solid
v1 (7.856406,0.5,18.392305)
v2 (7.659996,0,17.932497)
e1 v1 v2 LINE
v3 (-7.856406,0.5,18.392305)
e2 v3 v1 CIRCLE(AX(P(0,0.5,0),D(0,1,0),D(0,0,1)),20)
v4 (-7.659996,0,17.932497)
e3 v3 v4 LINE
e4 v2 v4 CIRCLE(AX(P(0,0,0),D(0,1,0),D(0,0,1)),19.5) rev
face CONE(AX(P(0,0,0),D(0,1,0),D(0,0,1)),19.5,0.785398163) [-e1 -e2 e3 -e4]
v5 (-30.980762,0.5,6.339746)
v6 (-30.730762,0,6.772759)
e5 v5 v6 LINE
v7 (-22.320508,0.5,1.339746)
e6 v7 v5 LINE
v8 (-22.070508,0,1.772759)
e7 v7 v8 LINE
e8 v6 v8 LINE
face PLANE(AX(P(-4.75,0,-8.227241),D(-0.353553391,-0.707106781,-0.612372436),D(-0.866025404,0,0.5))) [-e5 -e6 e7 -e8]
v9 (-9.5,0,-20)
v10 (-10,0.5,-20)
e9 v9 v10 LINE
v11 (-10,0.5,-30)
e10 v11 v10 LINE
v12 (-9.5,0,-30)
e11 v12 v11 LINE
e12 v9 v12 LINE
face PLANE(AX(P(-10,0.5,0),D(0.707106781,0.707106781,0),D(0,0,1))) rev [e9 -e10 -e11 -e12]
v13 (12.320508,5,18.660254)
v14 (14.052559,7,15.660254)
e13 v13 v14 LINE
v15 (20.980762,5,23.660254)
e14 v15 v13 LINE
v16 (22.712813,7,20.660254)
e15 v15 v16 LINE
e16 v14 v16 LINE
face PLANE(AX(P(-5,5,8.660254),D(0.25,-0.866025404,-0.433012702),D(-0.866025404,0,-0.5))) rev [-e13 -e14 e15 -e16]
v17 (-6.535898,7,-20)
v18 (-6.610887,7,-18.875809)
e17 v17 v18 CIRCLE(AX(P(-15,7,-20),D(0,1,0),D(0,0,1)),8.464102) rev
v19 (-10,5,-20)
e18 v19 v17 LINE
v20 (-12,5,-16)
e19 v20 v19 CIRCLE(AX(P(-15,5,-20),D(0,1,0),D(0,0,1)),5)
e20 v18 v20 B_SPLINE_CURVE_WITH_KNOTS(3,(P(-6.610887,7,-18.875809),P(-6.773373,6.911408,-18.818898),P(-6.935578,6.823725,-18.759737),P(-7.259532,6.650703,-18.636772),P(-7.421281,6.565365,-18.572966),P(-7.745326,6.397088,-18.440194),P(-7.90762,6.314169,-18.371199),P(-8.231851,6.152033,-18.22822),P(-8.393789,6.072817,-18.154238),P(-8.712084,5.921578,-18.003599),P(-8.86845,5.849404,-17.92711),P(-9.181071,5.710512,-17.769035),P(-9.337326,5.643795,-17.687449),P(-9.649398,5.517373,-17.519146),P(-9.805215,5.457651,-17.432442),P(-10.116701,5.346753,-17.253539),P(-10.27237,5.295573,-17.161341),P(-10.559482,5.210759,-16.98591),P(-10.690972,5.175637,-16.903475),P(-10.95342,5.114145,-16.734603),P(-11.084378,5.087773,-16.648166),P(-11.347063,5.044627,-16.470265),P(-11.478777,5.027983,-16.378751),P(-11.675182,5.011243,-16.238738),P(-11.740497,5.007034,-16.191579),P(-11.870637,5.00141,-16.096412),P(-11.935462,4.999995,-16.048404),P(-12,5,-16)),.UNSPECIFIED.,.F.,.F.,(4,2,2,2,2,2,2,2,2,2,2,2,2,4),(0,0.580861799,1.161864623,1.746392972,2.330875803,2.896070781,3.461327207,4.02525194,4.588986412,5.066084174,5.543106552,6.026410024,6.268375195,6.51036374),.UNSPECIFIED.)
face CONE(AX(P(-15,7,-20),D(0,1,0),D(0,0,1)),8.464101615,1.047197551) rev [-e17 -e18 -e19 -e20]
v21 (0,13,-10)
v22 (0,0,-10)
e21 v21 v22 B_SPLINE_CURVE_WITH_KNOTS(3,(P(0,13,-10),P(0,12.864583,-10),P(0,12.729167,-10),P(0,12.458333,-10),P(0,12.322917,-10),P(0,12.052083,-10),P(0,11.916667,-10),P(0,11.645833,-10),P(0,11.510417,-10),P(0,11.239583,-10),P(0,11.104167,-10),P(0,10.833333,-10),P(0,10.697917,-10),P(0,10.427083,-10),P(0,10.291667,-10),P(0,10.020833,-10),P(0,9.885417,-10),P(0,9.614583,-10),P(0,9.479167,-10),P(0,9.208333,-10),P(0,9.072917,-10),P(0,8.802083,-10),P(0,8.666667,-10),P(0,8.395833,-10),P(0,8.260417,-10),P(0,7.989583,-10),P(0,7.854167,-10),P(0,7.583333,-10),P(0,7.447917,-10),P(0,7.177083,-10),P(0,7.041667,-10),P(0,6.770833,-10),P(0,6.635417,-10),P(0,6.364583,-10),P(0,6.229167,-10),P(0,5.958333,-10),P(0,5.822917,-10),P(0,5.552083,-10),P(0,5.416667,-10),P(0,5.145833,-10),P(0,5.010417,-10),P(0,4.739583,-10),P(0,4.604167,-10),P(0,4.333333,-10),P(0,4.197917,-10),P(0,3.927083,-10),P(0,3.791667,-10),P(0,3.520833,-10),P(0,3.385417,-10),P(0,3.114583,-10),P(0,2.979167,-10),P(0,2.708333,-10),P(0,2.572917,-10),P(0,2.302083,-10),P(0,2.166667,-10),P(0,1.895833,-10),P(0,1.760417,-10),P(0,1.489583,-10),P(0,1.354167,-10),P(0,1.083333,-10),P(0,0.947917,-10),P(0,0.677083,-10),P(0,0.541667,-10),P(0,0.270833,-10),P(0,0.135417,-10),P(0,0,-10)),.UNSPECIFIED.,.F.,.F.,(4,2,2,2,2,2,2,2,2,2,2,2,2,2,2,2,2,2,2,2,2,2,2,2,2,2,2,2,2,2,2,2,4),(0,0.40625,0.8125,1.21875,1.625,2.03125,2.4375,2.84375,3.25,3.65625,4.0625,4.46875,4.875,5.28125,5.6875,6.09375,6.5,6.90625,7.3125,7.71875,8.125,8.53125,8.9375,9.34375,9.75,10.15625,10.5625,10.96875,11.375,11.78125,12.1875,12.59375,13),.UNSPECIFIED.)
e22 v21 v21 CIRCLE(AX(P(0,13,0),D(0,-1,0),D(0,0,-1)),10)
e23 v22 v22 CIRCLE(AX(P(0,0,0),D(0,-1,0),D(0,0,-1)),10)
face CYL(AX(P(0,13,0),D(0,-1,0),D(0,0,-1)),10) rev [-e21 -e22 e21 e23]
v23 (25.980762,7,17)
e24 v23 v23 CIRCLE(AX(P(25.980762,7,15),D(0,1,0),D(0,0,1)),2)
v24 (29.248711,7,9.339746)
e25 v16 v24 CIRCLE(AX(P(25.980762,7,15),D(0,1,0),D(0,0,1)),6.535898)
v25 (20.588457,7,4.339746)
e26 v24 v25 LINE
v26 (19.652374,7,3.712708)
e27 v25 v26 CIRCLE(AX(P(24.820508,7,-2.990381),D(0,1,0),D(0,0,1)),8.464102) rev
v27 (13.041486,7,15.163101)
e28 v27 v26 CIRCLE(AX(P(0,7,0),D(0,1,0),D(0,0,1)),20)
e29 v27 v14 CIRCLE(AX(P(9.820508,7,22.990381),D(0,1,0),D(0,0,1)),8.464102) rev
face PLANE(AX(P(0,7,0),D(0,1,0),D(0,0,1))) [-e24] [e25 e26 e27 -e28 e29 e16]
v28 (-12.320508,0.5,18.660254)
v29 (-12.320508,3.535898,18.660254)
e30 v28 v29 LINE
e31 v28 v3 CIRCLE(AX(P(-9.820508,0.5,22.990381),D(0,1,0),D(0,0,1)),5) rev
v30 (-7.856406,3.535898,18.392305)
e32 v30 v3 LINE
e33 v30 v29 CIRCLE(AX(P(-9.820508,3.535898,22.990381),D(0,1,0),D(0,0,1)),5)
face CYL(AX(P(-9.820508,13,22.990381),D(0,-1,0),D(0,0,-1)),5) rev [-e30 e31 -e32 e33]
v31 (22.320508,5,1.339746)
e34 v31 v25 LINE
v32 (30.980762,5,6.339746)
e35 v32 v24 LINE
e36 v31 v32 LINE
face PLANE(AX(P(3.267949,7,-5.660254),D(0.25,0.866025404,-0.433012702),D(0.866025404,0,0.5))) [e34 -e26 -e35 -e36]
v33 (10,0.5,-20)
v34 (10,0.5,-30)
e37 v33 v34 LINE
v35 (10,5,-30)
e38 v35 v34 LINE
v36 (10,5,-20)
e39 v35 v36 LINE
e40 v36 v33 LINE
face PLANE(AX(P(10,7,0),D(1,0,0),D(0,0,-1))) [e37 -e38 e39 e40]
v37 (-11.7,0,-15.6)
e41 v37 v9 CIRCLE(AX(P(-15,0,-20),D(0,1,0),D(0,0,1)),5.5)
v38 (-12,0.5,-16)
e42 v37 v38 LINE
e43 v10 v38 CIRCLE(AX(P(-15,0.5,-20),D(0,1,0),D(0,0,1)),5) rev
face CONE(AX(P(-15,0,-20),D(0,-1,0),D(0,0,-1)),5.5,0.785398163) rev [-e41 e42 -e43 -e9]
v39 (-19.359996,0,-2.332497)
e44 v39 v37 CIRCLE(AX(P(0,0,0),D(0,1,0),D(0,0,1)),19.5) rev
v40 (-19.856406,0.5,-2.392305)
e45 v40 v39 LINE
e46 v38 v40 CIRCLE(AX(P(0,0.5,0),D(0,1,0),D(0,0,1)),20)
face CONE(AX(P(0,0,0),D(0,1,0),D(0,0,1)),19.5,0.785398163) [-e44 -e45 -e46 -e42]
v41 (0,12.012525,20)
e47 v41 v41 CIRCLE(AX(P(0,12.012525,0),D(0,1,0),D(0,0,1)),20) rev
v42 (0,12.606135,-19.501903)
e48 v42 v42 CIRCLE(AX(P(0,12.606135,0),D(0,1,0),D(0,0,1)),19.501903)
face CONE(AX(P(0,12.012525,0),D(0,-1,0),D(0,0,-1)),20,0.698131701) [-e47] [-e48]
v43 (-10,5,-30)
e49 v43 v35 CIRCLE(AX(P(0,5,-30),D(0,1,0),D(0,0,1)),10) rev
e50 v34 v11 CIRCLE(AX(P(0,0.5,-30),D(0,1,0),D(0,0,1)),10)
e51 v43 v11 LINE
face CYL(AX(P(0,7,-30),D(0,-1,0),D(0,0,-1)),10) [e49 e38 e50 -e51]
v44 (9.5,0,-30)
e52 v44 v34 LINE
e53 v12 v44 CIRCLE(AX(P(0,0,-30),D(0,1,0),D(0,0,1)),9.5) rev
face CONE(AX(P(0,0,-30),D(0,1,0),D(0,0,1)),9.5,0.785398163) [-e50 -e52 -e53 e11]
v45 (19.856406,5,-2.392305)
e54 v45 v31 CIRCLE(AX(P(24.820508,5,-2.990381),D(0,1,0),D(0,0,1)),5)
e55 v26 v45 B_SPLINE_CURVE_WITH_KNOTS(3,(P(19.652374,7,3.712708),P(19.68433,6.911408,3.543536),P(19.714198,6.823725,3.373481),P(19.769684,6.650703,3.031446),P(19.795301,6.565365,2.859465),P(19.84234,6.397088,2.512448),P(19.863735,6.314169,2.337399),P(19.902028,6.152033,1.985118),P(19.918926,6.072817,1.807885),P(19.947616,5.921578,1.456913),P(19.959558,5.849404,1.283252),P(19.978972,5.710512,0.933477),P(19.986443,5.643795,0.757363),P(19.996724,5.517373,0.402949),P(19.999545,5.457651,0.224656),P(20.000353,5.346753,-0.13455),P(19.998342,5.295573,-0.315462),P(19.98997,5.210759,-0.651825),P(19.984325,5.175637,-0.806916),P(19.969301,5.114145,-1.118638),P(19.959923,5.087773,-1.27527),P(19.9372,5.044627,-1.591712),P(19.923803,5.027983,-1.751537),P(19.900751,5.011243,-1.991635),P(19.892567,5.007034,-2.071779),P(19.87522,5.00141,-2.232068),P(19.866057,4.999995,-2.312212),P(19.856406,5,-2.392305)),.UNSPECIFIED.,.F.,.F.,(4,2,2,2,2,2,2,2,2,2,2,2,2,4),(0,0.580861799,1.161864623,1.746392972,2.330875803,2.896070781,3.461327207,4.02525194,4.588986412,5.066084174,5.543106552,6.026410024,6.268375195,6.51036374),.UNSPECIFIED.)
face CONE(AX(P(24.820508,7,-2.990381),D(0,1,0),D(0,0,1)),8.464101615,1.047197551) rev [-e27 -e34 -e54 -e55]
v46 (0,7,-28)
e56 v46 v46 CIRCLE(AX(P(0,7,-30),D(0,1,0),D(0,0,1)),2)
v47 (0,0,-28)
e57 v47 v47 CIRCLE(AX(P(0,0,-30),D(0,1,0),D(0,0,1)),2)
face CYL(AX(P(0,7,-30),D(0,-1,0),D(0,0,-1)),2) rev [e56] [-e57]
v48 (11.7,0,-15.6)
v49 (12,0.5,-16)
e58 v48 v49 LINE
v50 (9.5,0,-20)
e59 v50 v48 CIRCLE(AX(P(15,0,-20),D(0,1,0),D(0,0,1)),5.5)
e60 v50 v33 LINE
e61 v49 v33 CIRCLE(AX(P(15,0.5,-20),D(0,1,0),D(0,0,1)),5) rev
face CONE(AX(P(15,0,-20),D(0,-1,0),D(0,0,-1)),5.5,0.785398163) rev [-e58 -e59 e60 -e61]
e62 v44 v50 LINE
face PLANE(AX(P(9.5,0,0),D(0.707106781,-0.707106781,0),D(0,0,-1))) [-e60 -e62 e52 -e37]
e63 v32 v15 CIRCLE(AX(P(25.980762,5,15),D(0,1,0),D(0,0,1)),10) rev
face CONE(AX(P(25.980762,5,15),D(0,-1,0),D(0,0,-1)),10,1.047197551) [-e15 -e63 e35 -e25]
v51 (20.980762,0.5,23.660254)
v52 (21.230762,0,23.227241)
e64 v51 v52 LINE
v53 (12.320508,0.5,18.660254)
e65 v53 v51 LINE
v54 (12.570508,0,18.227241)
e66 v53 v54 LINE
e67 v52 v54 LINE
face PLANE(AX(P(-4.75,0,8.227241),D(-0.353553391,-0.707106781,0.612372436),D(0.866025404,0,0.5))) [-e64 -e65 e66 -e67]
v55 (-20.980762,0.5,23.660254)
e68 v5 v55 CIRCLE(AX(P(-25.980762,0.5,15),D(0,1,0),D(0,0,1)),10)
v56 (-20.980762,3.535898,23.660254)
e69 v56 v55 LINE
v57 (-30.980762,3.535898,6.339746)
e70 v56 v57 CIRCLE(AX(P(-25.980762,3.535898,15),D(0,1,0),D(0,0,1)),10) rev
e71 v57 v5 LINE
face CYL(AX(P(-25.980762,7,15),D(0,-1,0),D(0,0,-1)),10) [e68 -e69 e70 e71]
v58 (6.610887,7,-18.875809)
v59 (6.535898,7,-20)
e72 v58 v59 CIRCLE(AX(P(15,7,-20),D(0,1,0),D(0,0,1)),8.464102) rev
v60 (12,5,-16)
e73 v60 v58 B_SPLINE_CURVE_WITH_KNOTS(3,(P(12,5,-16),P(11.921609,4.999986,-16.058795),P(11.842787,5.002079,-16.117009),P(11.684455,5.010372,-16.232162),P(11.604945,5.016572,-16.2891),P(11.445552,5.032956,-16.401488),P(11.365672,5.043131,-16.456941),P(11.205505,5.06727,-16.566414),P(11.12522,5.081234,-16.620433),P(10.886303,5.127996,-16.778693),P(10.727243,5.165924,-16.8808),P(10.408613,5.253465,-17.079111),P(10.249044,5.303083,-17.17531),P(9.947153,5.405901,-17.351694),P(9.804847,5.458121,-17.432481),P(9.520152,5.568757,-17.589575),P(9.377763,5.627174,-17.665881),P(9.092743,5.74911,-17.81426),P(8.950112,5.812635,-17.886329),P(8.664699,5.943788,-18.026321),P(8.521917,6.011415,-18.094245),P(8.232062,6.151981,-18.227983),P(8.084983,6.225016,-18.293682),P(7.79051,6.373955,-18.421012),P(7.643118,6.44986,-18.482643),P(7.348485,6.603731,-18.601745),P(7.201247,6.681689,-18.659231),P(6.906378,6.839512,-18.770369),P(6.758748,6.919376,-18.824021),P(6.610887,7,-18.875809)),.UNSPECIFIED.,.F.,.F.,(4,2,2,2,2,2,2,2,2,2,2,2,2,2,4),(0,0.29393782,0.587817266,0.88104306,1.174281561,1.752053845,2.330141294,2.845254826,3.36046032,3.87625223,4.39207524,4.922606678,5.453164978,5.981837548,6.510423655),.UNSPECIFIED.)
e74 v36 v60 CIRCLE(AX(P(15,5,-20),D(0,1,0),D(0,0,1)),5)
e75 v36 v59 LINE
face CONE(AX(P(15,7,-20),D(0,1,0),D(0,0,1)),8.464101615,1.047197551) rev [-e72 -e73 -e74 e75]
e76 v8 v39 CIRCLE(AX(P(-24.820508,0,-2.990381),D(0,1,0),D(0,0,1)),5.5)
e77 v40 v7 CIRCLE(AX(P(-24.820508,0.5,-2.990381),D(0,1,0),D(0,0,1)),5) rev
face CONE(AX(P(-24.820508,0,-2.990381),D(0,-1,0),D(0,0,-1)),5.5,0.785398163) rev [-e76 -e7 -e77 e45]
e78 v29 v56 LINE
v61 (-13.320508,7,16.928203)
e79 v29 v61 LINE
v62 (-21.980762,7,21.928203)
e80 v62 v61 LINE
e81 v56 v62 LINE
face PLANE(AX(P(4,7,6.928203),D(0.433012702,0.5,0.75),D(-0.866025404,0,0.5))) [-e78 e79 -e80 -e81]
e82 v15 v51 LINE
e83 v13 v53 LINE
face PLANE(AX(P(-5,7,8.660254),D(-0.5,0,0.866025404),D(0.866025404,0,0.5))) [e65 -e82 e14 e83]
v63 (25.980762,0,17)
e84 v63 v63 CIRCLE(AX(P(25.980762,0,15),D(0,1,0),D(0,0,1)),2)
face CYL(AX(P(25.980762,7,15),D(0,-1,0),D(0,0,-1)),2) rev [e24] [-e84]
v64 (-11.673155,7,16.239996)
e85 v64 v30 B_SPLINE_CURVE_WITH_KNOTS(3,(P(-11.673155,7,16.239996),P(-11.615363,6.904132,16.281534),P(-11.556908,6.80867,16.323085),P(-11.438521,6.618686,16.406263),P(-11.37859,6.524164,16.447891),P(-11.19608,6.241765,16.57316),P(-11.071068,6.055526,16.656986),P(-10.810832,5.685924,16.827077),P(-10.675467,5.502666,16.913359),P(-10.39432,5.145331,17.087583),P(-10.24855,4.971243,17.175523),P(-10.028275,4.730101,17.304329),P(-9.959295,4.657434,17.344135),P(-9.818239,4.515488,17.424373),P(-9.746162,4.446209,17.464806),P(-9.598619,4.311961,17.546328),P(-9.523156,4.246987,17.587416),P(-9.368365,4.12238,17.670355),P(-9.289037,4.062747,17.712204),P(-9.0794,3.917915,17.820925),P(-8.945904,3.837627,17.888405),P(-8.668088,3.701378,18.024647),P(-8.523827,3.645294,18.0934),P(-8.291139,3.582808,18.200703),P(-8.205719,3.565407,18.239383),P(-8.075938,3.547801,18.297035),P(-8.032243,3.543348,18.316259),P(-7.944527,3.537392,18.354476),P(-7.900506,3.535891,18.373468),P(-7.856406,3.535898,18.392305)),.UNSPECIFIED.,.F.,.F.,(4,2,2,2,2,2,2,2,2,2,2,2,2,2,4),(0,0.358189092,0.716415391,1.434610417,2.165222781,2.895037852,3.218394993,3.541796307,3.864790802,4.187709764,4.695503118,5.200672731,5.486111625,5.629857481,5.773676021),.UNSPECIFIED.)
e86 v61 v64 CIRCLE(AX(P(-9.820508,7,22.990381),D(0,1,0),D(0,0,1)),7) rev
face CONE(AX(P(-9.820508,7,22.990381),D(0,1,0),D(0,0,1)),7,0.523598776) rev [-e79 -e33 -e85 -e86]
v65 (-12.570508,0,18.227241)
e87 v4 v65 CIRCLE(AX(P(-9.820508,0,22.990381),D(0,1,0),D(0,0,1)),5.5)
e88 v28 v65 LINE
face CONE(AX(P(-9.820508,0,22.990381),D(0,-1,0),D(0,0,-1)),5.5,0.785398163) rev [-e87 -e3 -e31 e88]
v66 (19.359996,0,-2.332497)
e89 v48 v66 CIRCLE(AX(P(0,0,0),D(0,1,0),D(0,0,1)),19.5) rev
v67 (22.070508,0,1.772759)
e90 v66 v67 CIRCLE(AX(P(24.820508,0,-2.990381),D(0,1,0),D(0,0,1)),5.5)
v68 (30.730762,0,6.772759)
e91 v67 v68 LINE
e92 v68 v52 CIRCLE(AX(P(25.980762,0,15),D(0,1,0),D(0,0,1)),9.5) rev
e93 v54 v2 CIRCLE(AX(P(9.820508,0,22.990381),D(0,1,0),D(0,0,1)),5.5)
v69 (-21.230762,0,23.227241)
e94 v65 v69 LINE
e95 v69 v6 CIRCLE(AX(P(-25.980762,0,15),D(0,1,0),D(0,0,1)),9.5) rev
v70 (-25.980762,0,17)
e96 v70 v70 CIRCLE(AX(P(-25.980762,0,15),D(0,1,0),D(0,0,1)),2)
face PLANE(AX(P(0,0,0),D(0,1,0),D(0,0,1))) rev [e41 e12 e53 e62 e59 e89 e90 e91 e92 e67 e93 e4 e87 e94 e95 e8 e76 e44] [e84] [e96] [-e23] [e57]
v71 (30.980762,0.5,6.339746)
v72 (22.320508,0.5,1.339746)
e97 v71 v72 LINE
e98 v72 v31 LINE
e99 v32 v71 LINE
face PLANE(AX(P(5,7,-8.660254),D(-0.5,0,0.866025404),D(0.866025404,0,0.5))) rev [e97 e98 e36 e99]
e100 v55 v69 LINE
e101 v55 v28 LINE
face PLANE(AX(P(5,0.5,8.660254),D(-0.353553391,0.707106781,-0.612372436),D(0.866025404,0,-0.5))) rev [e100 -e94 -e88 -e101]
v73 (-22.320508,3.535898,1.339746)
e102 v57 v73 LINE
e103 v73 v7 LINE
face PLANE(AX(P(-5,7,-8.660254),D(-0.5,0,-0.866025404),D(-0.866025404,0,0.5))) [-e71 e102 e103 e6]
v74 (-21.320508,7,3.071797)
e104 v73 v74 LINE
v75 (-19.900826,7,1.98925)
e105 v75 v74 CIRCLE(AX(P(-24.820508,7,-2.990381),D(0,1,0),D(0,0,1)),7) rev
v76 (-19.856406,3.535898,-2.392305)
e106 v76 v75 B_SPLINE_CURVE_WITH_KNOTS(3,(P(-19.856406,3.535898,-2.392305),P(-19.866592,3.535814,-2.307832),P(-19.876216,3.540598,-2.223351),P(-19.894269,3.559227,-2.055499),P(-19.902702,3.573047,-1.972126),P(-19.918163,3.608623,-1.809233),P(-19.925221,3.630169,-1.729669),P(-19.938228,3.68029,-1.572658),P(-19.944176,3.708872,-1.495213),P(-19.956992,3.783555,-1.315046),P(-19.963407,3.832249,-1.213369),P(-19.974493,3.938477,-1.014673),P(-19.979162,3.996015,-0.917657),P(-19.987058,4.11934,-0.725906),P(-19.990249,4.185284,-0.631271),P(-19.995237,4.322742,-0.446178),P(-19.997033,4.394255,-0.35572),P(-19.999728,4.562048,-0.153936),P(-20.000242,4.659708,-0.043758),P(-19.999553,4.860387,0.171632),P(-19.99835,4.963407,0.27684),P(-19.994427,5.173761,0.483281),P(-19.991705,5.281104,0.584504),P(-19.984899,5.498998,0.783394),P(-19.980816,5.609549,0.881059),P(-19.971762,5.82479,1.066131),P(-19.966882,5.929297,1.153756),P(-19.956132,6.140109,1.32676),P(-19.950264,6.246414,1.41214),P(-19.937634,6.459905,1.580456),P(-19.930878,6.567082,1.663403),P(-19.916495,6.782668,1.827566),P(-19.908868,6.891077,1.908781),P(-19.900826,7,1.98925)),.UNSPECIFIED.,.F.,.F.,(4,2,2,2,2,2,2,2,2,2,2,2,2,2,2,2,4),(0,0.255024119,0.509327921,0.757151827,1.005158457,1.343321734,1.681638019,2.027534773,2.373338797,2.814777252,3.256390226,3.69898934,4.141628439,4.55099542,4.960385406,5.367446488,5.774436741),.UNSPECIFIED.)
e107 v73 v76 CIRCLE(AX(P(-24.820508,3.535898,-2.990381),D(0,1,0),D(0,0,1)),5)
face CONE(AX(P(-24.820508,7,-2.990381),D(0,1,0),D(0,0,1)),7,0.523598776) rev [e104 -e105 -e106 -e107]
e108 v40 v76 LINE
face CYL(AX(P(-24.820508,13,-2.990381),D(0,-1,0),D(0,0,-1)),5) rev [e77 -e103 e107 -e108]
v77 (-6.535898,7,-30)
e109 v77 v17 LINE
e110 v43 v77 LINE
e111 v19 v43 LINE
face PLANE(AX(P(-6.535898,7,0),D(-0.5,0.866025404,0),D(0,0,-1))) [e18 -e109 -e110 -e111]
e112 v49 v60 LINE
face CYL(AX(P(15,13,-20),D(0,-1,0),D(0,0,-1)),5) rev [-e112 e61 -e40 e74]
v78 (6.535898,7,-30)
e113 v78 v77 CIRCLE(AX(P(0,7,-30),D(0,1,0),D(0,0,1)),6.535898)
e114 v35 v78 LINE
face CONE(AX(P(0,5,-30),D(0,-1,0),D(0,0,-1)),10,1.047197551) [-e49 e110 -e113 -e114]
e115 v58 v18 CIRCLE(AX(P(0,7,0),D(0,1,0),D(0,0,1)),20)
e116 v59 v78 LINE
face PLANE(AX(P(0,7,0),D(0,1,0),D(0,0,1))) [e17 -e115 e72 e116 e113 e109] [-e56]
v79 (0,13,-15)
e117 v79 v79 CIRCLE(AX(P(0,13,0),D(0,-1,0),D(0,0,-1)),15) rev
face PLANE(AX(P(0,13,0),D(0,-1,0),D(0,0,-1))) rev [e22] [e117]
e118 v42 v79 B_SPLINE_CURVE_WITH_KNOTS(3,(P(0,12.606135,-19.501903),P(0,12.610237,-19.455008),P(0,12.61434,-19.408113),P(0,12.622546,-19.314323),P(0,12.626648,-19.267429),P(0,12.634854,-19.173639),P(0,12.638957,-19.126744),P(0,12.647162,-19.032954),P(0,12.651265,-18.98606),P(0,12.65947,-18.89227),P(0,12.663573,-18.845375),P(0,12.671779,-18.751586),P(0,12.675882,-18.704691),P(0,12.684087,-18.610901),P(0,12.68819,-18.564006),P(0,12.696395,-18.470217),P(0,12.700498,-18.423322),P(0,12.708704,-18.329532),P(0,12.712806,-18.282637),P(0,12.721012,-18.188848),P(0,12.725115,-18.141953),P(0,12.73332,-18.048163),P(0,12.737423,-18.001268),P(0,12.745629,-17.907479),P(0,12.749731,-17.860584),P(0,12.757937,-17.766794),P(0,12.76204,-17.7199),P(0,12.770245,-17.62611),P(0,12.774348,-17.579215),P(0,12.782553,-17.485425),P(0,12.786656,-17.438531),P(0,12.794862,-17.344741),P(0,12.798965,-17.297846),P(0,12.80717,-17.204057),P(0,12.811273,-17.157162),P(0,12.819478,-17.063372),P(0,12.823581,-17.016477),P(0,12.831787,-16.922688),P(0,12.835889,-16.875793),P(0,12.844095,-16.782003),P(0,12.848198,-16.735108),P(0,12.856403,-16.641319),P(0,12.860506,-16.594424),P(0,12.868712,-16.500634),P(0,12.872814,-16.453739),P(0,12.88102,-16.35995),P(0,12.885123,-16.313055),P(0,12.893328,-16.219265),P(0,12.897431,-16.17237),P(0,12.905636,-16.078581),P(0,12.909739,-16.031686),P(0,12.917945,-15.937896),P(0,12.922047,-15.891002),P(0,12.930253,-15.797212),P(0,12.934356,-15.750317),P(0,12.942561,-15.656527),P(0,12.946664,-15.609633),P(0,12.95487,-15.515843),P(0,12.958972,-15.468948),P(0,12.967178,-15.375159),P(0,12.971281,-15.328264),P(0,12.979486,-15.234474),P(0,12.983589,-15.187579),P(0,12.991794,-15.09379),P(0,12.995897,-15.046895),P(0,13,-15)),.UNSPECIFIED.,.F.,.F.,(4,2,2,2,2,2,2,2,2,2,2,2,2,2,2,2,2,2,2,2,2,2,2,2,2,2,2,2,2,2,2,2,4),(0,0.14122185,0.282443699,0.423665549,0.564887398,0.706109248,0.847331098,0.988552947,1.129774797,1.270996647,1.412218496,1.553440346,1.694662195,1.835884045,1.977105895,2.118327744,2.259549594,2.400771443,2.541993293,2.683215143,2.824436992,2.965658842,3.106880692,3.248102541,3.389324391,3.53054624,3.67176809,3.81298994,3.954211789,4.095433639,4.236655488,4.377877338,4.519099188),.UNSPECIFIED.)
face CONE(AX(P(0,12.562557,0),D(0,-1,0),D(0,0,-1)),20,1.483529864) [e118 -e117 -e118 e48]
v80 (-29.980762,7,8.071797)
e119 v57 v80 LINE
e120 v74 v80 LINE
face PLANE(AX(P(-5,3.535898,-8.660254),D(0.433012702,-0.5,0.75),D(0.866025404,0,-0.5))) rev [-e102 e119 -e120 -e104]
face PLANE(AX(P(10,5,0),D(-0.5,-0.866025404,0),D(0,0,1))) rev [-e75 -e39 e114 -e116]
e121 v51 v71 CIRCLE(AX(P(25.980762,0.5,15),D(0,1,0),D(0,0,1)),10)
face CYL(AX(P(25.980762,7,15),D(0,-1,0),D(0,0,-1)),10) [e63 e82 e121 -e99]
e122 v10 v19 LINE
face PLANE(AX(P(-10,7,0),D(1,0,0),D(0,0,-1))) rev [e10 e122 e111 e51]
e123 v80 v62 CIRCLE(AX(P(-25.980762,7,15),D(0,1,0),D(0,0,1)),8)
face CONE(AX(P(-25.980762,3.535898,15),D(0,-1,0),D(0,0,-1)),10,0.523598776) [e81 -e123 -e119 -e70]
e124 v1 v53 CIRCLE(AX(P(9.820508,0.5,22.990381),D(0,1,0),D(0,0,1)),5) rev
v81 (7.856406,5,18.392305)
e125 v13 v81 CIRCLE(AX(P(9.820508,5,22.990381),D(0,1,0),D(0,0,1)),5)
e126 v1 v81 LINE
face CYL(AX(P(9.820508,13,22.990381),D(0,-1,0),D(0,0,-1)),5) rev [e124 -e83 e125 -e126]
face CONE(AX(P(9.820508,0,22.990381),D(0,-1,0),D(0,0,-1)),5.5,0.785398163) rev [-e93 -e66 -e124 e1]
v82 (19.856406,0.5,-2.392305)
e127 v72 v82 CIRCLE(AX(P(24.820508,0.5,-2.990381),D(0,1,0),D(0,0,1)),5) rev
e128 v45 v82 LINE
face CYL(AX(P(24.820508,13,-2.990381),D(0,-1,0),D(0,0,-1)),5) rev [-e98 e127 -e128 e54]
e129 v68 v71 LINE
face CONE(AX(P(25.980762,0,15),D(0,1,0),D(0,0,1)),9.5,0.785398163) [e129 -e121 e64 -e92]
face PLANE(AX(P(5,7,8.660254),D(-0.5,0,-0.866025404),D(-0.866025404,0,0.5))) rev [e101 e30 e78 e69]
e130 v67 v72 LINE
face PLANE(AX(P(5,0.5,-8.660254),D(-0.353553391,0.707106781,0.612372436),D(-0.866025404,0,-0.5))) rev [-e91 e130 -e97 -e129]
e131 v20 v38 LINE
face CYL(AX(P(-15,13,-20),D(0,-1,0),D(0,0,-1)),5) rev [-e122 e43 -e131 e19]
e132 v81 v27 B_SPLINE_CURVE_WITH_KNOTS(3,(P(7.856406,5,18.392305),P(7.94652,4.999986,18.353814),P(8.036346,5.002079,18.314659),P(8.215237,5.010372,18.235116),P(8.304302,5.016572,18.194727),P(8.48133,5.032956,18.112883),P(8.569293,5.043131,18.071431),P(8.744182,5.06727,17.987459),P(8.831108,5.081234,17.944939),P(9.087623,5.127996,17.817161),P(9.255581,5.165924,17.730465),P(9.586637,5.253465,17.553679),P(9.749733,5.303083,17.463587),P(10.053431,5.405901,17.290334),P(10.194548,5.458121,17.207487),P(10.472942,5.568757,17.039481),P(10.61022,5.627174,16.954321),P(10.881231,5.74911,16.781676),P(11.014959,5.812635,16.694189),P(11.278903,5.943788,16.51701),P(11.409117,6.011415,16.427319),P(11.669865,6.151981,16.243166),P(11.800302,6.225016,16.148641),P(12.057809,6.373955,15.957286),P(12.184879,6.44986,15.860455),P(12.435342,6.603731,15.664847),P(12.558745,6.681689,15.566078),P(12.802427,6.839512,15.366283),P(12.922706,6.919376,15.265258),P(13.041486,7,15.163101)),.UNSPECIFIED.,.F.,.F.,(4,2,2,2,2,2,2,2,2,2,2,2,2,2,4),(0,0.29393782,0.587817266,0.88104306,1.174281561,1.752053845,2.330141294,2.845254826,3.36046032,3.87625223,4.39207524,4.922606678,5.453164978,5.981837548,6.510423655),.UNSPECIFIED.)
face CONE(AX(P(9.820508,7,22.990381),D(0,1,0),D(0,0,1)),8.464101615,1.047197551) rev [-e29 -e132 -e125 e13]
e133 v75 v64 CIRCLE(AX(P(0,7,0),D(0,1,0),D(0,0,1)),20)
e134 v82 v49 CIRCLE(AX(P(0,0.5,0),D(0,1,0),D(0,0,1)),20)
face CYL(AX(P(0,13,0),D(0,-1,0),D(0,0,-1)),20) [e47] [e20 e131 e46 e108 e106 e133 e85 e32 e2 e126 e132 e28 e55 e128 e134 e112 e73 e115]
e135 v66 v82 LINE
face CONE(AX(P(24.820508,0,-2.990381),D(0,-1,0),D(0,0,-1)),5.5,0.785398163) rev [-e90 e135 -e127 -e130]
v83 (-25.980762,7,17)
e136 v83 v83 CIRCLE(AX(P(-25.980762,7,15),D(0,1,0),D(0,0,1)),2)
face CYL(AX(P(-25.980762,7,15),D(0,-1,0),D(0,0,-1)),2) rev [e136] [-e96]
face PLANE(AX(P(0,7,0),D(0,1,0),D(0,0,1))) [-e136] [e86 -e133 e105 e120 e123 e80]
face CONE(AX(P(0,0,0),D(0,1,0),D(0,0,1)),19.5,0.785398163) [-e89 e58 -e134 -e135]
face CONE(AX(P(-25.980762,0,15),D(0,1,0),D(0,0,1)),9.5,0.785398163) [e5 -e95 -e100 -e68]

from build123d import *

# Parameters (mm, degrees)
SKETCH_2_R        = 2
EXTRUDE_1_DEPTH   = 7
EXTRUDE_1_2_DEPTH = 7
EXTRUDE_1_3_DEPTH = 7
SKETCH_3_R        = 20
SKETCH_3_R_2      = 10
EXTRUDE_2_DEPTH   = 13
FILLET_1_R        = 5
CHAMFER_1_SIZE    = 5
CHAMFER_1_SIZE2   = 0.437443318
CHAMFER_2_SIZE    = 3.464101615
CHAMFER_2_SIZE_2  = 2
CHAMFER_3_SIZE    = 0.5
CHAMFER_4_SIZE    = 0.5
CHAMFER_4_SIZE2   = 0.550031434


with BuildPart() as part:
    # ｽｹｯﾁ2 → ﾎﾞｽ - 押し出し1 (new body)
    with BuildSketch(Plane(origin=(0, 0, 0), x_dir=(1, 0, 0), z_dir=(0, 1, 0))):
        with BuildLine():
            Line((10, -17.320508076), (20.980762114, -23.660254038))
            ThreePointArc((20.980762114, -23.660254038), (34.641016151, -20), (30.980762114, -6.339745962))
            Line((30.980762114, -6.339745962), (20, 0))
            ThreePointArc((20, 0), (17.320508076, -10), (10, -17.320508076))
        make_face()
        with Locations(Location((25.980762114, -15, 0), (0, 0, 270))):
            Circle(SKETCH_2_R, mode=Mode.SUBTRACT)
    extrude(amount=EXTRUDE_1_DEPTH)



with BuildPart() as body_2:
    # ｽｹｯﾁ2 → Extrude 1 2 (new body)
    with BuildSketch(Plane(origin=(0, 0, 0), x_dir=(1, 0, 0), z_dir=(0, 1, 0))):
        with BuildLine():
            Line((-20.980762114, -23.660254038), (-10, -17.320508076))
            ThreePointArc((-10, -17.320508076), (-17.320508076, -10), (-20, 0))
            Line((-20, 0), (-30.980762114, -6.339745962))
            ThreePointArc((-30.980762114, -6.339745962), (-34.641016151, -20), (-20.980762114, -23.660254038))
        make_face()
        with Locations(Location((-25.980762114, -15, 0), (0, 0, 270))):
            Circle(SKETCH_2_R, mode=Mode.SUBTRACT)
    extrude(amount=EXTRUDE_1_2_DEPTH)


with BuildPart() as body_3:
    # ｽｹｯﾁ2 → Extrude 1 3 (new body)
    with BuildSketch(Plane(origin=(0, 0, 0), x_dir=(1, 0, 0), z_dir=(0, 1, 0))):
        with BuildLine():
            ThreePointArc((-10, 17.320508076), (0, 20), (10, 17.320508076))
            Line((10, 17.320508076), (10, 30))
            ThreePointArc((10, 30), (0, 40), (-10, 30))
            Line((-10, 30), (-10, 17.320508076))
        make_face()
        with Locations(Location((0, 30, 0), (0, 0, 270))):
            Circle(SKETCH_2_R, mode=Mode.SUBTRACT)
    extrude(amount=EXTRUDE_1_3_DEPTH)


with BuildPart() as part_1:
    add(part.part)

    add(body_2.part)  # ﾎﾞｽ - 押し出し2 merges body 2

    add(body_3.part)  # ﾎﾞｽ - 押し出し2 merges body 3
    # ｽｹｯﾁ3 → ﾎﾞｽ - 押し出し2 (add)
    with BuildSketch(Plane.XZ):
        with Locations(Location((0, 0, 0), (0, 0, 270))):
            Circle(SKETCH_3_R)
        with Locations(Location((0, 0, 0), (0, 0, 270))):
            Circle(SKETCH_3_R_2, mode=Mode.SUBTRACT)
    extrude(amount=-EXTRUDE_2_DEPTH)

    # ﾌｨﾚｯﾄ1
    fillet_1_edges = [part_1.edges().sort_by_distance(p)[0] for p in [
        (10, 3.5, 17.320508076),
        (20, 3.5, 0),
        (-10, 3.5, 17.320508076),
        (-20, 3.5, 0),
        (-10, 3.5, -17.320508076),
        (10, 3.5, -17.320508076),
    ]]
    fillet(fillet_1_edges, radius=FILLET_1_R)

    # 面取り1
    chamfer_1_edges = [part_1.edges().sort_by_distance(p)[0] for p in [
        (0, 13, 20),
    ]]
    chamfer_1_side = [part_1.faces().sort_by_distance(p)[0] for p in [
        (0, 13, 19.434314575),
    ]]
    chamfer(chamfer_1_edges, length=CHAMFER_1_SIZE, length2=CHAMFER_1_SIZE2, reference=chamfer_1_side[0])

    # 面取り2
    # the kernel refuses this chamfer: 3.464101615, 2 mm, written as the material it takes off along each edge
    with BuildSketch(Plane(origin=(12.320508076, 7, 18.660254038), x_dir=(0.4999066103111042, 0.01932676561270069, -0.8658636480983676), z_dir=(0.8660254037844386, 0, 0.5000000000000003)), Plane(origin=(10, 7, -20), x_dir=(-0.9998132206222079, 0.01932676561270069, 0), z_dir=(0, 0, -1)), Plane(origin=(-10, 7, -30), x_dir=(0.9998132206222079, 0.01932676561270069, 0), z_dir=(0, 0, 1)), Plane(origin=(30.980762114, 7, 6.339745962), x_dir=(-0.4999066103111044, 0.01932676561270069, 0.8658636480983674), z_dir=(-0.8660254037844385, 0, -0.5000000000000004))) as chamfer_2_piece_1:
        Polygon((CHAMFER_2_SIZE * 0.999813220662, -CHAMFER_2_SIZE * 0.0193267656135), (-CHAMFER_2_SIZE_2 * 0.0193267656127, -CHAMFER_2_SIZE_2 * 0.999813220622), (0, 0), align=None)
    extrude(amount=10, mode=Mode.SUBTRACT)
    with BuildSketch(Plane(origin=(-25.980762114, 7, 15), x_dir=(-0.5000000000000021, 0, -0.8660254037844373), z_dir=(0.8660254037844373, 0, -0.5000000000000021))) as chamfer_2_piece_2:
        Polygon((10 - CHAMFER_2_SIZE_2, 0), (10, -CHAMFER_2_SIZE), (10, 0), align=None)
    revolve(axis=Axis((-25.980762114, 7, 15), (0, 1, 0)), revolution_arc=180, mode=Mode.SUBTRACT)
    with BuildSketch(Plane(origin=(-22.320508076, 7, 1.339745962), x_dir=(0.49916137187689635, 0.05789386240267152, 0.8645728572665669), z_dir=(-0.8660254037844386, 0, 0.5000000000000001)), Plane(origin=(-20.980762114, 7, 23.660254038), x_dir=(-0.4991613718768962, 0.057893862402671505, -0.8645728572665671), z_dir=(0.8660254037844387, 0, -0.49999999999999983))) as chamfer_2_piece_3:
        Polygon((CHAMFER_2_SIZE_2 * 0.998322743754, -CHAMFER_2_SIZE_2 * 0.0578938624027), (-CHAMFER_2_SIZE * 0.057893862405, -CHAMFER_2_SIZE * 0.998322743793), (0, 0), align=None)
    extrude(amount=10, mode=Mode.SUBTRACT)
    with BuildSketch(Plane(origin=(-24.820508076, 7, -2.990381057), x_dir=(-0.10176135112534013, 0, -0.9948088396356083), z_dir=(-0.9948088396356083, 0, 0.10176135112534013))) as chamfer_2_piece_4_section:
        Polygon((5, CHAMFER_2_SIZE), (5 + CHAMFER_2_SIZE_2, 0), (5, 0), align=None)
    chamfer_2_piece_4 = revolve(axis=Axis((-24.820508076, 7, -2.990381057), (0, -1, 0)), revolution_arc=155.840605946, mode=Mode.PRIVATE)
    chamfer_2_piece_4 = chamfer_2_piece_4 - Plane(origin=(0, 5.431561908, 0), x_dir=(0, 0, -1), z_dir=(0, -1, 0)) * Cylinder(20, 28, mode=Mode.PRIVATE)
    add(chamfer_2_piece_4, mode=Mode.SUBTRACT)
    with BuildSketch(Plane(origin=(-9.820508076, 7, 22.990381057), x_dir=(0.8106490514710499, 0, 0.5855323350158272), z_dir=(-0.5855323350158272, 0, 0.8106490514710499))) as chamfer_2_piece_5_section:
        Polygon((5 + CHAMFER_2_SIZE_2, 0), (5, -CHAMFER_2_SIZE), (5, 0), align=None)
    chamfer_2_piece_5 = revolve(axis=Axis((-9.820508076, 7, 22.990381057), (0, 1, 0)), revolution_arc=155.840605946, mode=Mode.PRIVATE)
    chamfer_2_piece_5 = chamfer_2_piece_5 - Plane(origin=(0, 5.431562064, 0), x_dir=(0, 0, -1), z_dir=(0, -1, 0)) * Cylinder(20, 29, mode=Mode.PRIVATE)
    add(chamfer_2_piece_5, mode=Mode.SUBTRACT)
    with BuildSketch(Plane(origin=(0, 7, -30), x_dir=(1, 0, 0), z_dir=(0, 0, 1))) as chamfer_2_piece_6:
        Polygon((10 - CHAMFER_2_SIZE, 0), (10, -CHAMFER_2_SIZE_2), (10, 0), align=None)
    revolve(axis=Axis((0, 7, -30), (0, 1, 0)), revolution_arc=180, mode=Mode.SUBTRACT)
    with BuildSketch(Plane(origin=(25.980762114, 7, 15), x_dir=(-0.4999999999999975, 0, 0.8660254037844399), z_dir=(-0.8660254037844399, 0, -0.4999999999999975))) as chamfer_2_piece_7:
        Polygon((10 - CHAMFER_2_SIZE, 0), (10, -CHAMFER_2_SIZE_2), (10, 0), align=None)
    revolve(axis=Axis((25.980762114, 7, 15), (0, 1, 0)), revolution_arc=180, mode=Mode.SUBTRACT)
    with BuildSketch(Plane(origin=(-15, 7, -20), x_dir=(-0.9124104025964815, 0, 0.40927650461970855), z_dir=(-0.40927650461970855, 0, -0.9124104025964815))) as chamfer_2_piece_8_section:
        Polygon((5 + CHAMFER_2_SIZE, 0), (5, -CHAMFER_2_SIZE_2), (5, 0), align=None)
    chamfer_2_piece_8 = revolve(axis=Axis((-15, 7, -20), (0, 1, 0)), revolution_arc=155.840605946, mode=Mode.PRIVATE)
    chamfer_2_piece_8 = chamfer_2_piece_8 - Plane(origin=(0, 6.05627025, 0), x_dir=(0, 0, -1), z_dir=(0, -1, 0)) * Cylinder(20, 34, mode=Mode.PRIVATE)
    add(chamfer_2_piece_8, mode=Mode.SUBTRACT)
    with BuildSketch(Plane(origin=(9.820508076, 7, 22.990381057), x_dir=(-0.8106490514711084, 0, 0.5855323350157463), z_dir=(0.5855323350157463, 0, 0.8106490514711084))) as chamfer_2_piece_9_section:
        Polygon((5 + CHAMFER_2_SIZE, 0), (5, CHAMFER_2_SIZE_2), (5, 0), align=None)
    chamfer_2_piece_9 = revolve(axis=Axis((9.820508076, 7, 22.990381057), (0, -1, 0)), revolution_arc=155.840605946, mode=Mode.PRIVATE)
    chamfer_2_piece_9 = chamfer_2_piece_9 - Plane(origin=(0, 6.056270332, 0), x_dir=(0, 0, -1), z_dir=(0, -1, 0)) * Cylinder(20, 34, mode=Mode.PRIVATE)
    add(chamfer_2_piece_9, mode=Mode.SUBTRACT)
    with BuildSketch(Plane(origin=(24.820508076, 7, -2.990381057), x_dir=(0.1017613511254389, 0, -0.9948088396355981), z_dir=(0.9948088396355981, 0, 0.1017613511254389))) as chamfer_2_piece_10_section:
        Polygon((5, -CHAMFER_2_SIZE_2), (5 + CHAMFER_2_SIZE, 0), (5, 0), align=None)
    chamfer_2_piece_10 = revolve(axis=Axis((24.820508076, 7, -2.990381057), (0, 1, 0)), revolution_arc=155.840605946, mode=Mode.PRIVATE)
    chamfer_2_piece_10 = chamfer_2_piece_10 - Plane(origin=(0, 6.056270131, 0), x_dir=(0, 0, -1), z_dir=(0, -1, 0)) * Cylinder(20, 34, mode=Mode.PRIVATE)
    add(chamfer_2_piece_10, mode=Mode.SUBTRACT)
    with BuildSketch(Plane(origin=(15, 7, -20), x_dir=(0.9124104025963968, 0, 0.4092765046198976), z_dir=(0.4092765046198976, 0, -0.9124104025963968))) as chamfer_2_piece_11_section:
        Polygon((5 + CHAMFER_2_SIZE, 0), (5, CHAMFER_2_SIZE_2), (5, 0), align=None)
    chamfer_2_piece_11 = revolve(axis=Axis((15, 7, -20), (0, -1, 0)), revolution_arc=155.840605946, mode=Mode.PRIVATE)
    chamfer_2_piece_11 = chamfer_2_piece_11 - Plane(origin=(0, 6.056270339, 0), x_dir=(0, 0, -1), z_dir=(0, -1, 0)) * Cylinder(20, 34, mode=Mode.PRIVATE)
    add(chamfer_2_piece_11, mode=Mode.SUBTRACT)

    # 面取り3
    chamfer_3_edges = [part_1.edges().sort_by_distance(p)[0] for p in [
        (-16.650635095, 0, 21.160254038),
        (-34.641016151, 0, 20),
        (-26.650635095, 0, 3.839745962),
        (-10, 0, -25),
        (0, 0, -40),
        (10, 0, -25),
        (-17.320508076, 0, -10),
        (0, 0, 20),
        (17.320508076, 0, -10),
        (-10.527864045, 0, -17.763932023),
        (-20.647948425, 0, -0.235431699),
        (-10.12008438, 0, 17.999363722),
        (10.12008438, 0, 17.999363722),
        (20.647948425, 0, -0.235431699),
        (16.650635095, 0, 21.160254038),
        (10.527864045, 0, -17.763932022),
        (26.650635095, 0, 3.839745962),
        (34.641016151, 0, 20),
    ]]
    chamfer(chamfer_3_edges, length=CHAMFER_3_SIZE)

    # 面取り4
    chamfer_4_edges = [part_1.edges().sort_by_distance(p)[0] for p in [
        (0, 12.562556682, 20),
    ]]
    chamfer_4_side = [part_1.faces().sort_by_distance(p)[0] for p in [
        (0, 12.781278341, 17.5),
    ]]
    chamfer(chamfer_4_edges, length=CHAMFER_4_SIZE, length2=CHAMFER_4_SIZE2, reference=chamfer_4_side[0])


solid = part_1.part
